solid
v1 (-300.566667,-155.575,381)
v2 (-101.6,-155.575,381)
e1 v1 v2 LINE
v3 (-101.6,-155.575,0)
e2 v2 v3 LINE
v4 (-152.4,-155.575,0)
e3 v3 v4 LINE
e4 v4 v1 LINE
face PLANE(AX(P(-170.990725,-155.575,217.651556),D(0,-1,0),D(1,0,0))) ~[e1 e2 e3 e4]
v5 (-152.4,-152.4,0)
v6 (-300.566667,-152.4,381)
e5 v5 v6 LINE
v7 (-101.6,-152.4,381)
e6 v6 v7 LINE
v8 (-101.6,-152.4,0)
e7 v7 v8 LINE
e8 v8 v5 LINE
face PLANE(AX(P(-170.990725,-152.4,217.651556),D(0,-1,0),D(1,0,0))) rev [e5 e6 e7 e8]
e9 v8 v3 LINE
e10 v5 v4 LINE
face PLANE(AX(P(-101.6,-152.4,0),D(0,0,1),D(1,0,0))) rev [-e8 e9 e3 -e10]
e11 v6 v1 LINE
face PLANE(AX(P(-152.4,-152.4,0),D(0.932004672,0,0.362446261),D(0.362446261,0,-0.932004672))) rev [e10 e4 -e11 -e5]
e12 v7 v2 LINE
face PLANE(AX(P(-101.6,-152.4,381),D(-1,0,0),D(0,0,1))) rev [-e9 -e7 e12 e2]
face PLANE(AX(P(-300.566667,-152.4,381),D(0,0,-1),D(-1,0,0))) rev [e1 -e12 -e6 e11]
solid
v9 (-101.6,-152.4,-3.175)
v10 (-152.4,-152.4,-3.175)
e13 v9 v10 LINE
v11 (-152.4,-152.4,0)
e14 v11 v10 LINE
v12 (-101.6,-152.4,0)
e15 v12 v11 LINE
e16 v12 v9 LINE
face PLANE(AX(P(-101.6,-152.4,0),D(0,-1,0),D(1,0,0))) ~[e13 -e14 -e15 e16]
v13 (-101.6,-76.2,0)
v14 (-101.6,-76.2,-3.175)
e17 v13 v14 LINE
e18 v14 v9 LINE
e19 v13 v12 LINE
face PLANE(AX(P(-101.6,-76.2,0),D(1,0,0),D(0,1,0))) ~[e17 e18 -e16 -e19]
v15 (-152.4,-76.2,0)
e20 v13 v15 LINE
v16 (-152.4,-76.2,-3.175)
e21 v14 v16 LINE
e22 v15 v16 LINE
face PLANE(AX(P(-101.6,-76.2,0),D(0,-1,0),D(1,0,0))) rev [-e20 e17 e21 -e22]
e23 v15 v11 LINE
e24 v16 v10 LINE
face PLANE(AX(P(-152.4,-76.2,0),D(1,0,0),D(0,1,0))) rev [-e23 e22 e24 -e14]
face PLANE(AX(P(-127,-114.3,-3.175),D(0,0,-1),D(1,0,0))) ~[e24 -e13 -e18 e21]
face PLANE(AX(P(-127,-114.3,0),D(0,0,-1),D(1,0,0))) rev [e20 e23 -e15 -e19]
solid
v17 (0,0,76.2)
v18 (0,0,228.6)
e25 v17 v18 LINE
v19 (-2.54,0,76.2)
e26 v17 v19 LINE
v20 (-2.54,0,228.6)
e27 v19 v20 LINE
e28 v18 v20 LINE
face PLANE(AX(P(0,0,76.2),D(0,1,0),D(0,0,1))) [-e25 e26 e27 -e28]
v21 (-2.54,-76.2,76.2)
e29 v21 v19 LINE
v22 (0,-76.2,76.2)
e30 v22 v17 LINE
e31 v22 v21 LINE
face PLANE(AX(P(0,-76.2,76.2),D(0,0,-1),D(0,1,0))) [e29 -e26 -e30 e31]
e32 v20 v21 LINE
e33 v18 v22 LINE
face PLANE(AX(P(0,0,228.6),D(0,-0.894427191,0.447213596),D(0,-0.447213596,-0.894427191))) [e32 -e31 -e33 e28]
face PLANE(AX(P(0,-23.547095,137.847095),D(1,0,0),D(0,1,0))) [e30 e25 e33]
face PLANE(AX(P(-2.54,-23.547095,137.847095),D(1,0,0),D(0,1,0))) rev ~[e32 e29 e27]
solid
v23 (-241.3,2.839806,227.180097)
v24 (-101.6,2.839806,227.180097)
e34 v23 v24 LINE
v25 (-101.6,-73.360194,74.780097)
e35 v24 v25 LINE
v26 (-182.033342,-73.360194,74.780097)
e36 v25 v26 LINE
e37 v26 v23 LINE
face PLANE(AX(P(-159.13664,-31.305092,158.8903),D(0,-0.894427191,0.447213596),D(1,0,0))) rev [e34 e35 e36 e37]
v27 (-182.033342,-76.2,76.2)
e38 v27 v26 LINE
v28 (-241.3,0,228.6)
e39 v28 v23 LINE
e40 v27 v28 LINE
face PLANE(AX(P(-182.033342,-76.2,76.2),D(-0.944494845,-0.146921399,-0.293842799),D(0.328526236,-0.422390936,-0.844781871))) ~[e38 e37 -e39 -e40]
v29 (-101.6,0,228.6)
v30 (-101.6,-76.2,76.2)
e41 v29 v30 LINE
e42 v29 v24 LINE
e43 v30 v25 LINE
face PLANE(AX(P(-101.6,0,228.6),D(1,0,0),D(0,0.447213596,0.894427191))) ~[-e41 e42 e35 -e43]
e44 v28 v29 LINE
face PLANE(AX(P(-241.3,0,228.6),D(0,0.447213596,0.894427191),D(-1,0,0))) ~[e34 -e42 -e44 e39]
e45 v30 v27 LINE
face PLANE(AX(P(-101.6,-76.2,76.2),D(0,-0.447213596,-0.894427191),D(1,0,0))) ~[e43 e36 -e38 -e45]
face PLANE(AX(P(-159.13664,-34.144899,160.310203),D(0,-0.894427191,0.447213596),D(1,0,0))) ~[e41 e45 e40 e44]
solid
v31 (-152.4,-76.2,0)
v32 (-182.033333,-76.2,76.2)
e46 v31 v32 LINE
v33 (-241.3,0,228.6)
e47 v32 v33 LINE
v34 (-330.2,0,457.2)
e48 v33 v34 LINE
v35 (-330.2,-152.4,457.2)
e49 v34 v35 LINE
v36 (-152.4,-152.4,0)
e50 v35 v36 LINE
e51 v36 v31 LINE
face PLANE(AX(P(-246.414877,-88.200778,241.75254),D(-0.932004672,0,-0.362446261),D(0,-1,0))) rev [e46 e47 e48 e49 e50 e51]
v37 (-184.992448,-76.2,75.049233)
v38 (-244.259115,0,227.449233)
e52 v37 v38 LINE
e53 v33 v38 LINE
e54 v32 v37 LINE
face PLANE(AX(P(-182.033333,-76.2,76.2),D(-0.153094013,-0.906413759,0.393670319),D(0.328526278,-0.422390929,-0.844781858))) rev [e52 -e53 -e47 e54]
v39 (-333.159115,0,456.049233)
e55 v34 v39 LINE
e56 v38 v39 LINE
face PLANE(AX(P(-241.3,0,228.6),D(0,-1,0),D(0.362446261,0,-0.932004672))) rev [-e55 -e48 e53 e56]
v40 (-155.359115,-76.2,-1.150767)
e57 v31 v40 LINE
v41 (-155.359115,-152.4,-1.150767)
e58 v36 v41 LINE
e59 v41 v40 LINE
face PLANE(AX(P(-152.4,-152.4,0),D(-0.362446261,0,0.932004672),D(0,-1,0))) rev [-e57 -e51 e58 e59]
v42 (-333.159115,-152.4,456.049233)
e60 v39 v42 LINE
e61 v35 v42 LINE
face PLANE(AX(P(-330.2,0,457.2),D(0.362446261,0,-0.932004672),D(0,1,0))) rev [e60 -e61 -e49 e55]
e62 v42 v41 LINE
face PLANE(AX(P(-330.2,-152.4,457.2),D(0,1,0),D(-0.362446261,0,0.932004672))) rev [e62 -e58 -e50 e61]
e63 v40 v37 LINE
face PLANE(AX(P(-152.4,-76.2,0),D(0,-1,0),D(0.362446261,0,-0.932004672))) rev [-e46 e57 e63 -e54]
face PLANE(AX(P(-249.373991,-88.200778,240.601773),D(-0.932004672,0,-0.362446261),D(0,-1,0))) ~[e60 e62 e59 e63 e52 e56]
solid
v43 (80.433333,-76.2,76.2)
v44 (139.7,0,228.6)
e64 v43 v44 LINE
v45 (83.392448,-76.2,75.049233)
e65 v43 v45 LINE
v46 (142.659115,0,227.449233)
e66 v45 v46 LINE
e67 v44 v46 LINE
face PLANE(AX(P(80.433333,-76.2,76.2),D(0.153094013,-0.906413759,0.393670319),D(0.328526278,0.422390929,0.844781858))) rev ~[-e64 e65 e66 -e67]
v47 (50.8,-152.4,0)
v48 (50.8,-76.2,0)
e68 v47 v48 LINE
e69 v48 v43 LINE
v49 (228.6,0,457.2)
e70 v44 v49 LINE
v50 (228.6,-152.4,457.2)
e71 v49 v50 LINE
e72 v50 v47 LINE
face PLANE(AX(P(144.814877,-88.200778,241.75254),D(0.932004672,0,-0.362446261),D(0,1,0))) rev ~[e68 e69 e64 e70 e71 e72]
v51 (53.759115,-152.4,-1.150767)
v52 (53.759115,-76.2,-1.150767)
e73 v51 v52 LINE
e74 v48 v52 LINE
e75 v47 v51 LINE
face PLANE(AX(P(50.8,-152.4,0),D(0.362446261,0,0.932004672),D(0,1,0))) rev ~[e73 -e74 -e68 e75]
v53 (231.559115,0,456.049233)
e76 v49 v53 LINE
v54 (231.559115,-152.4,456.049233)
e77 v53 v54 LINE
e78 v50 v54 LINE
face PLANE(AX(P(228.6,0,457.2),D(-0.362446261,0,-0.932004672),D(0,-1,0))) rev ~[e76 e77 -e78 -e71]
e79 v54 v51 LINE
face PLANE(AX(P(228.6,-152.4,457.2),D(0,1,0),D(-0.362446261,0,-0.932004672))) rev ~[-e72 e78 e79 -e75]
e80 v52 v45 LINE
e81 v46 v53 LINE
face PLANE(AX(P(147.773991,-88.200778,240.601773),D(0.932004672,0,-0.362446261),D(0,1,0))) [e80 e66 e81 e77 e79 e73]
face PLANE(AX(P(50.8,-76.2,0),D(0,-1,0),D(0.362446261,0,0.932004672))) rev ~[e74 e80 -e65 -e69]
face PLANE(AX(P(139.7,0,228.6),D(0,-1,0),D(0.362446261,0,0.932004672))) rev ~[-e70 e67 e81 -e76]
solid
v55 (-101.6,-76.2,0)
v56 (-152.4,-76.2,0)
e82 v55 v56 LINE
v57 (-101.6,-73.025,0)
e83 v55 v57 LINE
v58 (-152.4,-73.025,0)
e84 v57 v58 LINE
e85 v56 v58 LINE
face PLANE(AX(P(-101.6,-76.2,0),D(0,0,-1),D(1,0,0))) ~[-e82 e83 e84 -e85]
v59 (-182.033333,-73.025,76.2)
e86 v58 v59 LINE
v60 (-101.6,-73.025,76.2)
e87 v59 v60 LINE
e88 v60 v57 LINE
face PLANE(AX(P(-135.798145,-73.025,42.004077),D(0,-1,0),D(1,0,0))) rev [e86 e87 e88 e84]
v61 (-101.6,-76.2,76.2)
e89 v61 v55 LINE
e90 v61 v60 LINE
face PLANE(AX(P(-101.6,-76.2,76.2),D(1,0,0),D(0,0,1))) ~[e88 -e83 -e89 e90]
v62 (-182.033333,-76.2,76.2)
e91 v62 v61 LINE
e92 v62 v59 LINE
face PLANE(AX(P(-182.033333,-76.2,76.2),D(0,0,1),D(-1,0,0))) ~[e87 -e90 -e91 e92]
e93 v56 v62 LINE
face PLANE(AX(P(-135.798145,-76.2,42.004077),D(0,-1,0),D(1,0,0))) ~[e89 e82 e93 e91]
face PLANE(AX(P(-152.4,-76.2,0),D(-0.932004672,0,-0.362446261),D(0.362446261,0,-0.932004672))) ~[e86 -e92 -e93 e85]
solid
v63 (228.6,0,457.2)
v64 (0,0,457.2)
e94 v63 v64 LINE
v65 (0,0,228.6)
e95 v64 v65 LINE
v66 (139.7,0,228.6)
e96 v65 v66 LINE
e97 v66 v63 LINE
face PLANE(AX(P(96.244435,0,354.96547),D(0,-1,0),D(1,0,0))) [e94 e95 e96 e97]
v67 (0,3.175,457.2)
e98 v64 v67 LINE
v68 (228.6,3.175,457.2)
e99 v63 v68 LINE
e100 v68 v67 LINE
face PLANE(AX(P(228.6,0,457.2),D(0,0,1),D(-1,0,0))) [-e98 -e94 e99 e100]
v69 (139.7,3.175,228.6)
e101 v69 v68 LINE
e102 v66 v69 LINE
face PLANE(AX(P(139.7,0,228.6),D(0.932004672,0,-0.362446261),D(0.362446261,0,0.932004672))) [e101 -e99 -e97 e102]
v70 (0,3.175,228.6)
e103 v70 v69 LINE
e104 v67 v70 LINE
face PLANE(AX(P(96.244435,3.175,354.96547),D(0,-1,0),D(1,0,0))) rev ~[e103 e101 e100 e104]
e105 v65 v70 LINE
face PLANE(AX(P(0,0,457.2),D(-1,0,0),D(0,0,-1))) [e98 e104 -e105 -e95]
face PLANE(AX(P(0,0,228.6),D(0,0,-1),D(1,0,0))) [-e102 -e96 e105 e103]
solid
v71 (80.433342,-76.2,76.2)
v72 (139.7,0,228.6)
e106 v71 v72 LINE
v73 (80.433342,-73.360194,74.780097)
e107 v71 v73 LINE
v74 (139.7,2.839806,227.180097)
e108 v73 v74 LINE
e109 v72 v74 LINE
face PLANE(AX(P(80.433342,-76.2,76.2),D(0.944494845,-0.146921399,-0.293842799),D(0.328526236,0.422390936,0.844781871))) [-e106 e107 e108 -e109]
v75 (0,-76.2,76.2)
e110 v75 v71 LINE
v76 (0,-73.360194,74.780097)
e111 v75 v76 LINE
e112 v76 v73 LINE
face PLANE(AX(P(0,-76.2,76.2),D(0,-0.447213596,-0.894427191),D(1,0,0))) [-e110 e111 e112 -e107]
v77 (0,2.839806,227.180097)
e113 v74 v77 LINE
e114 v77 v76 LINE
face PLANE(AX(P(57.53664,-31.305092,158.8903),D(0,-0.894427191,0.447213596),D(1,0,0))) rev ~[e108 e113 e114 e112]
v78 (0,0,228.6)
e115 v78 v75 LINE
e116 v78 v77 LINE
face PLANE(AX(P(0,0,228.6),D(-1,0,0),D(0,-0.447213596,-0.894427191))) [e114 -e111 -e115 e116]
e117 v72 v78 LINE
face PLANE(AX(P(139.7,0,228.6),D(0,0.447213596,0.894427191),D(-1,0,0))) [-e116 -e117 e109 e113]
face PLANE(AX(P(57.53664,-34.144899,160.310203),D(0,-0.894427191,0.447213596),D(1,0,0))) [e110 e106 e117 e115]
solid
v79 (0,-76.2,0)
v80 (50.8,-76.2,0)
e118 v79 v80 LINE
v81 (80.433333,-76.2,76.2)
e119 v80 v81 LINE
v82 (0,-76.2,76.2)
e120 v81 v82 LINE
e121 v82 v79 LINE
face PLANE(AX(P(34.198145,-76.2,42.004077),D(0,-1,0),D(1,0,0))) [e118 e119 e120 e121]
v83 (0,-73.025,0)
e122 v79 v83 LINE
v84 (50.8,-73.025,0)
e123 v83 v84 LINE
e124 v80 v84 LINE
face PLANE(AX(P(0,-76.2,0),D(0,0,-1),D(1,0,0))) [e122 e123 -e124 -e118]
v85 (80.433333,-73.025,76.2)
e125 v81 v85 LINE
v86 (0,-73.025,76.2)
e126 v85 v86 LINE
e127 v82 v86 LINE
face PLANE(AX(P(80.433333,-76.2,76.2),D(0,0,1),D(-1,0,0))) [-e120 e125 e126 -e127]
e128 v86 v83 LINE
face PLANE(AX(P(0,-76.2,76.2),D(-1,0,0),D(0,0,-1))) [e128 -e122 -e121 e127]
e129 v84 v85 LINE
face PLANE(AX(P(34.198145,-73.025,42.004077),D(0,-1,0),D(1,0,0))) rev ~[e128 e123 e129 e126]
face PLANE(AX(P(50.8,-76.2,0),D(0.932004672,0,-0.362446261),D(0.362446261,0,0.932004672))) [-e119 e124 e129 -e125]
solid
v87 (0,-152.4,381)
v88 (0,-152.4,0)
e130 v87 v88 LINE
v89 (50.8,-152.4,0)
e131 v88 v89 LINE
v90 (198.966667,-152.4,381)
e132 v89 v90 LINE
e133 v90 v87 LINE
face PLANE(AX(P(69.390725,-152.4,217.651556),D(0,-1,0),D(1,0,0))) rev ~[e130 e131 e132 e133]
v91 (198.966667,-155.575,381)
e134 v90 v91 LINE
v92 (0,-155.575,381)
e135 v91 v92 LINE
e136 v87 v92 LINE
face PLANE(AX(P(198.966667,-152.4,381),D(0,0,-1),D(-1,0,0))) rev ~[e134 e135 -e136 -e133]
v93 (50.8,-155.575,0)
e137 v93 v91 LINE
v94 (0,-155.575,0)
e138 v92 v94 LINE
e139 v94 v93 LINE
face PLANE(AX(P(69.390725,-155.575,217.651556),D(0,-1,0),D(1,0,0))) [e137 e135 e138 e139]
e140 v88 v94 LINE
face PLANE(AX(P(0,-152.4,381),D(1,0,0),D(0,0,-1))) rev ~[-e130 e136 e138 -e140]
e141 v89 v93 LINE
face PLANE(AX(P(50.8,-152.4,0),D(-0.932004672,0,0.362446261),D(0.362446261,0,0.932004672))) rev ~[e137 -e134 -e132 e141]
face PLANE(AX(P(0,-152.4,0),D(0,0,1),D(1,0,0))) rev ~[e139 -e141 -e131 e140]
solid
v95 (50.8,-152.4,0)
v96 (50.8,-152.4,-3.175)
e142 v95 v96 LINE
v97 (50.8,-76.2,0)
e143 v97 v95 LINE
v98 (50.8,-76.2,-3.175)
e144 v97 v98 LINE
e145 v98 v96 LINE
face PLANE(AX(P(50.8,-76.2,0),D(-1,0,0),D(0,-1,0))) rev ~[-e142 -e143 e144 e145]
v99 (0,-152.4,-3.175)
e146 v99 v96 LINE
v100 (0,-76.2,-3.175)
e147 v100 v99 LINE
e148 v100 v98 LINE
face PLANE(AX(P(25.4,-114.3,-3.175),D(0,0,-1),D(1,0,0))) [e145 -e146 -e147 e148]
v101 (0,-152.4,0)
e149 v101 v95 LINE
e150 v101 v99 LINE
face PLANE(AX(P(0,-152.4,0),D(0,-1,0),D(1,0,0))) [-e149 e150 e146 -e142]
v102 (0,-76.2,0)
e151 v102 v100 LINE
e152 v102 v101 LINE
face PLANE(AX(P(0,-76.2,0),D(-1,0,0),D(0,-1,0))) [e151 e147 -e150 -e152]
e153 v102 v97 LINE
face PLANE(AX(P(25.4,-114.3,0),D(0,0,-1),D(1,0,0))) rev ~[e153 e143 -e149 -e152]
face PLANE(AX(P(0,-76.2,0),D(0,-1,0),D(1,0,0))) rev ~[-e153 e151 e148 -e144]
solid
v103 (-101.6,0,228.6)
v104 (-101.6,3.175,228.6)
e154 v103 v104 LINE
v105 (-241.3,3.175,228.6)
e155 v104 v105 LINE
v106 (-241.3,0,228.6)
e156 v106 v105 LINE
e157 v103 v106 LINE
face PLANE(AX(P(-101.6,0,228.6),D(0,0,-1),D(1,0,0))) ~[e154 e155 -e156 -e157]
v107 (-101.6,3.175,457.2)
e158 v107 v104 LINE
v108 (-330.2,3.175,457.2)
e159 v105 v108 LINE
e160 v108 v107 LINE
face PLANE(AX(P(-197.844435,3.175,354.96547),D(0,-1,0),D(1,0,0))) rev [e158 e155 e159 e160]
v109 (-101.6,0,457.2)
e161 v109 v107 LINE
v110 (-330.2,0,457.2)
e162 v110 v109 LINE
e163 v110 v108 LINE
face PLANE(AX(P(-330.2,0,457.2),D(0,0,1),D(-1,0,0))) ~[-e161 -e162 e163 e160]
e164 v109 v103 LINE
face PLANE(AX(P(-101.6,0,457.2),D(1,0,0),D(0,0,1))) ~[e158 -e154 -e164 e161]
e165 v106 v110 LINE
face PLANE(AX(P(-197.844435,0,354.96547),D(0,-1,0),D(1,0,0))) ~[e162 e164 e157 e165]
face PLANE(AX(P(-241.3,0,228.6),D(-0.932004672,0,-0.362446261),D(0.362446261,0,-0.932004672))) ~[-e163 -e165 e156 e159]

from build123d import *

# Parameters (mm, degrees)
F6_DEPTH  = 2.54
F8_DEPTH  = 3.175
F9_DEPTH  = 3.175
F10_DEPTH = 3.175
F11_DEPTH = 3.175
F13_DEPTH = 3.175
F15_W     = 50.8
F15_H     = 76.2
F16_DEPTH = 3.175


# Not quite as in the source:
# - ends of sketch curves that miss each other by under 0.0002 mm in the source are joined


with BuildPart() as f6:
    # F5 (on Right) → F6 (new body)
    with BuildSketch(Plane.YZ):
        Polygon((-76.2, 76.2), (0, 76.2), (0, 228.6), align=None)
    extrude(amount=-F6_DEPTH)


with BuildPart() as f8:
    # F1 (on offset) → F8 (new body)
    with BuildSketch(Plane.XZ.offset(152.4)):
        Polygon((0, 381), (0, 0), (50.8, 0), (198.9666666121, 381), align=None)
    extrude(amount=F8_DEPTH)


with BuildPart() as f9:
    # F4 (on Front) → F9 (new body)
    with BuildSketch(Plane.XZ):
        Polygon((228.6, 457.2), (0, 457.2), (0, 228.6), (139.7000000328, 228.6), align=None)
    extrude(amount=-F9_DEPTH)


with BuildPart() as f10:
    # F3 (on offset) → F10 (new body)
    with BuildSketch(Plane.XZ.offset(76.2)):
        Polygon((0, 76.2), (0, 0), (50.8, 0), (80.4333333224, 76.2), align=None)
    extrude(amount=-F10_DEPTH)


with BuildPart() as f11:
    # F7 (on face) → F11 (new body)
    with BuildSketch(Plane(origin=(0, -91.44, 45.72), x_dir=(1, 0, 0), z_dir=(0, -0.894427191, 0.4472135955))):
        Polygon((0, 204.4660558626), (0, 34.0776759771), (80.4333418, 34.0776759771), (139.7, 204.4660558626), align=None)
    extrude(amount=-F11_DEPTH)


with BuildPart() as f13:
    # F12 (on face) → F13 (new body)
    with BuildSketch(Plane(origin=(44.1265415592, 0, -17.1603217112), x_dir=(0, 1, 0), z_dir=(0.9320046716, 0, -0.362446261))):
        Polygon((-152.4, 427.2085042593), (-152.4, 18.4122700608), (-76.2, 18.4122700608), (-76.2, 100.1715169005), (0, 263.6900105918), (0, 508.9677511228), (-152.4, 508.9677511228), align=None)
    extrude(amount=F13_DEPTH)


with BuildPart() as f16:
    # F15 (on face) → F16 (new body)
    with BuildSketch(Plane(origin=(0, 0, 0), x_dir=(1, 0, 0), z_dir=(0, 0, -1))):
        with Locations((25.4, 114.3)):
            Rectangle(F15_W, F15_H)
    extrude(amount=F16_DEPTH)


with BuildPart() as f17_1:
    # F17: instance of F9
    add(f9.part.mirror(Plane.YZ.offset(-50.8)))


with BuildPart() as f17_2:
    # F17: instance of F13
    add(f13.part.mirror(Plane.YZ.offset(-50.8)))


with BuildPart() as f17_3:
    # F17: instance of F8
    add(f8.part.mirror(Plane.YZ.offset(-50.8)))


with BuildPart() as f17_4:
    # F17: instance of F10
    add(f10.part.mirror(Plane.YZ.offset(-50.8)))


with BuildPart() as f17_5:
    # F17: instance of F16
    add(f16.part.mirror(Plane.YZ.offset(-50.8)))


with BuildPart() as f17_6:
    # F17: instance of F11
    add(f11.part.mirror(Plane.YZ.offset(-50.8)))


solid = Compound([f6.part, f8.part, f9.part, f10.part, f11.part, f13.part, f16.part, f17_1.part, f17_2.part, f17_3.part, f17_4.part, f17_5.part, f17_6.part])
